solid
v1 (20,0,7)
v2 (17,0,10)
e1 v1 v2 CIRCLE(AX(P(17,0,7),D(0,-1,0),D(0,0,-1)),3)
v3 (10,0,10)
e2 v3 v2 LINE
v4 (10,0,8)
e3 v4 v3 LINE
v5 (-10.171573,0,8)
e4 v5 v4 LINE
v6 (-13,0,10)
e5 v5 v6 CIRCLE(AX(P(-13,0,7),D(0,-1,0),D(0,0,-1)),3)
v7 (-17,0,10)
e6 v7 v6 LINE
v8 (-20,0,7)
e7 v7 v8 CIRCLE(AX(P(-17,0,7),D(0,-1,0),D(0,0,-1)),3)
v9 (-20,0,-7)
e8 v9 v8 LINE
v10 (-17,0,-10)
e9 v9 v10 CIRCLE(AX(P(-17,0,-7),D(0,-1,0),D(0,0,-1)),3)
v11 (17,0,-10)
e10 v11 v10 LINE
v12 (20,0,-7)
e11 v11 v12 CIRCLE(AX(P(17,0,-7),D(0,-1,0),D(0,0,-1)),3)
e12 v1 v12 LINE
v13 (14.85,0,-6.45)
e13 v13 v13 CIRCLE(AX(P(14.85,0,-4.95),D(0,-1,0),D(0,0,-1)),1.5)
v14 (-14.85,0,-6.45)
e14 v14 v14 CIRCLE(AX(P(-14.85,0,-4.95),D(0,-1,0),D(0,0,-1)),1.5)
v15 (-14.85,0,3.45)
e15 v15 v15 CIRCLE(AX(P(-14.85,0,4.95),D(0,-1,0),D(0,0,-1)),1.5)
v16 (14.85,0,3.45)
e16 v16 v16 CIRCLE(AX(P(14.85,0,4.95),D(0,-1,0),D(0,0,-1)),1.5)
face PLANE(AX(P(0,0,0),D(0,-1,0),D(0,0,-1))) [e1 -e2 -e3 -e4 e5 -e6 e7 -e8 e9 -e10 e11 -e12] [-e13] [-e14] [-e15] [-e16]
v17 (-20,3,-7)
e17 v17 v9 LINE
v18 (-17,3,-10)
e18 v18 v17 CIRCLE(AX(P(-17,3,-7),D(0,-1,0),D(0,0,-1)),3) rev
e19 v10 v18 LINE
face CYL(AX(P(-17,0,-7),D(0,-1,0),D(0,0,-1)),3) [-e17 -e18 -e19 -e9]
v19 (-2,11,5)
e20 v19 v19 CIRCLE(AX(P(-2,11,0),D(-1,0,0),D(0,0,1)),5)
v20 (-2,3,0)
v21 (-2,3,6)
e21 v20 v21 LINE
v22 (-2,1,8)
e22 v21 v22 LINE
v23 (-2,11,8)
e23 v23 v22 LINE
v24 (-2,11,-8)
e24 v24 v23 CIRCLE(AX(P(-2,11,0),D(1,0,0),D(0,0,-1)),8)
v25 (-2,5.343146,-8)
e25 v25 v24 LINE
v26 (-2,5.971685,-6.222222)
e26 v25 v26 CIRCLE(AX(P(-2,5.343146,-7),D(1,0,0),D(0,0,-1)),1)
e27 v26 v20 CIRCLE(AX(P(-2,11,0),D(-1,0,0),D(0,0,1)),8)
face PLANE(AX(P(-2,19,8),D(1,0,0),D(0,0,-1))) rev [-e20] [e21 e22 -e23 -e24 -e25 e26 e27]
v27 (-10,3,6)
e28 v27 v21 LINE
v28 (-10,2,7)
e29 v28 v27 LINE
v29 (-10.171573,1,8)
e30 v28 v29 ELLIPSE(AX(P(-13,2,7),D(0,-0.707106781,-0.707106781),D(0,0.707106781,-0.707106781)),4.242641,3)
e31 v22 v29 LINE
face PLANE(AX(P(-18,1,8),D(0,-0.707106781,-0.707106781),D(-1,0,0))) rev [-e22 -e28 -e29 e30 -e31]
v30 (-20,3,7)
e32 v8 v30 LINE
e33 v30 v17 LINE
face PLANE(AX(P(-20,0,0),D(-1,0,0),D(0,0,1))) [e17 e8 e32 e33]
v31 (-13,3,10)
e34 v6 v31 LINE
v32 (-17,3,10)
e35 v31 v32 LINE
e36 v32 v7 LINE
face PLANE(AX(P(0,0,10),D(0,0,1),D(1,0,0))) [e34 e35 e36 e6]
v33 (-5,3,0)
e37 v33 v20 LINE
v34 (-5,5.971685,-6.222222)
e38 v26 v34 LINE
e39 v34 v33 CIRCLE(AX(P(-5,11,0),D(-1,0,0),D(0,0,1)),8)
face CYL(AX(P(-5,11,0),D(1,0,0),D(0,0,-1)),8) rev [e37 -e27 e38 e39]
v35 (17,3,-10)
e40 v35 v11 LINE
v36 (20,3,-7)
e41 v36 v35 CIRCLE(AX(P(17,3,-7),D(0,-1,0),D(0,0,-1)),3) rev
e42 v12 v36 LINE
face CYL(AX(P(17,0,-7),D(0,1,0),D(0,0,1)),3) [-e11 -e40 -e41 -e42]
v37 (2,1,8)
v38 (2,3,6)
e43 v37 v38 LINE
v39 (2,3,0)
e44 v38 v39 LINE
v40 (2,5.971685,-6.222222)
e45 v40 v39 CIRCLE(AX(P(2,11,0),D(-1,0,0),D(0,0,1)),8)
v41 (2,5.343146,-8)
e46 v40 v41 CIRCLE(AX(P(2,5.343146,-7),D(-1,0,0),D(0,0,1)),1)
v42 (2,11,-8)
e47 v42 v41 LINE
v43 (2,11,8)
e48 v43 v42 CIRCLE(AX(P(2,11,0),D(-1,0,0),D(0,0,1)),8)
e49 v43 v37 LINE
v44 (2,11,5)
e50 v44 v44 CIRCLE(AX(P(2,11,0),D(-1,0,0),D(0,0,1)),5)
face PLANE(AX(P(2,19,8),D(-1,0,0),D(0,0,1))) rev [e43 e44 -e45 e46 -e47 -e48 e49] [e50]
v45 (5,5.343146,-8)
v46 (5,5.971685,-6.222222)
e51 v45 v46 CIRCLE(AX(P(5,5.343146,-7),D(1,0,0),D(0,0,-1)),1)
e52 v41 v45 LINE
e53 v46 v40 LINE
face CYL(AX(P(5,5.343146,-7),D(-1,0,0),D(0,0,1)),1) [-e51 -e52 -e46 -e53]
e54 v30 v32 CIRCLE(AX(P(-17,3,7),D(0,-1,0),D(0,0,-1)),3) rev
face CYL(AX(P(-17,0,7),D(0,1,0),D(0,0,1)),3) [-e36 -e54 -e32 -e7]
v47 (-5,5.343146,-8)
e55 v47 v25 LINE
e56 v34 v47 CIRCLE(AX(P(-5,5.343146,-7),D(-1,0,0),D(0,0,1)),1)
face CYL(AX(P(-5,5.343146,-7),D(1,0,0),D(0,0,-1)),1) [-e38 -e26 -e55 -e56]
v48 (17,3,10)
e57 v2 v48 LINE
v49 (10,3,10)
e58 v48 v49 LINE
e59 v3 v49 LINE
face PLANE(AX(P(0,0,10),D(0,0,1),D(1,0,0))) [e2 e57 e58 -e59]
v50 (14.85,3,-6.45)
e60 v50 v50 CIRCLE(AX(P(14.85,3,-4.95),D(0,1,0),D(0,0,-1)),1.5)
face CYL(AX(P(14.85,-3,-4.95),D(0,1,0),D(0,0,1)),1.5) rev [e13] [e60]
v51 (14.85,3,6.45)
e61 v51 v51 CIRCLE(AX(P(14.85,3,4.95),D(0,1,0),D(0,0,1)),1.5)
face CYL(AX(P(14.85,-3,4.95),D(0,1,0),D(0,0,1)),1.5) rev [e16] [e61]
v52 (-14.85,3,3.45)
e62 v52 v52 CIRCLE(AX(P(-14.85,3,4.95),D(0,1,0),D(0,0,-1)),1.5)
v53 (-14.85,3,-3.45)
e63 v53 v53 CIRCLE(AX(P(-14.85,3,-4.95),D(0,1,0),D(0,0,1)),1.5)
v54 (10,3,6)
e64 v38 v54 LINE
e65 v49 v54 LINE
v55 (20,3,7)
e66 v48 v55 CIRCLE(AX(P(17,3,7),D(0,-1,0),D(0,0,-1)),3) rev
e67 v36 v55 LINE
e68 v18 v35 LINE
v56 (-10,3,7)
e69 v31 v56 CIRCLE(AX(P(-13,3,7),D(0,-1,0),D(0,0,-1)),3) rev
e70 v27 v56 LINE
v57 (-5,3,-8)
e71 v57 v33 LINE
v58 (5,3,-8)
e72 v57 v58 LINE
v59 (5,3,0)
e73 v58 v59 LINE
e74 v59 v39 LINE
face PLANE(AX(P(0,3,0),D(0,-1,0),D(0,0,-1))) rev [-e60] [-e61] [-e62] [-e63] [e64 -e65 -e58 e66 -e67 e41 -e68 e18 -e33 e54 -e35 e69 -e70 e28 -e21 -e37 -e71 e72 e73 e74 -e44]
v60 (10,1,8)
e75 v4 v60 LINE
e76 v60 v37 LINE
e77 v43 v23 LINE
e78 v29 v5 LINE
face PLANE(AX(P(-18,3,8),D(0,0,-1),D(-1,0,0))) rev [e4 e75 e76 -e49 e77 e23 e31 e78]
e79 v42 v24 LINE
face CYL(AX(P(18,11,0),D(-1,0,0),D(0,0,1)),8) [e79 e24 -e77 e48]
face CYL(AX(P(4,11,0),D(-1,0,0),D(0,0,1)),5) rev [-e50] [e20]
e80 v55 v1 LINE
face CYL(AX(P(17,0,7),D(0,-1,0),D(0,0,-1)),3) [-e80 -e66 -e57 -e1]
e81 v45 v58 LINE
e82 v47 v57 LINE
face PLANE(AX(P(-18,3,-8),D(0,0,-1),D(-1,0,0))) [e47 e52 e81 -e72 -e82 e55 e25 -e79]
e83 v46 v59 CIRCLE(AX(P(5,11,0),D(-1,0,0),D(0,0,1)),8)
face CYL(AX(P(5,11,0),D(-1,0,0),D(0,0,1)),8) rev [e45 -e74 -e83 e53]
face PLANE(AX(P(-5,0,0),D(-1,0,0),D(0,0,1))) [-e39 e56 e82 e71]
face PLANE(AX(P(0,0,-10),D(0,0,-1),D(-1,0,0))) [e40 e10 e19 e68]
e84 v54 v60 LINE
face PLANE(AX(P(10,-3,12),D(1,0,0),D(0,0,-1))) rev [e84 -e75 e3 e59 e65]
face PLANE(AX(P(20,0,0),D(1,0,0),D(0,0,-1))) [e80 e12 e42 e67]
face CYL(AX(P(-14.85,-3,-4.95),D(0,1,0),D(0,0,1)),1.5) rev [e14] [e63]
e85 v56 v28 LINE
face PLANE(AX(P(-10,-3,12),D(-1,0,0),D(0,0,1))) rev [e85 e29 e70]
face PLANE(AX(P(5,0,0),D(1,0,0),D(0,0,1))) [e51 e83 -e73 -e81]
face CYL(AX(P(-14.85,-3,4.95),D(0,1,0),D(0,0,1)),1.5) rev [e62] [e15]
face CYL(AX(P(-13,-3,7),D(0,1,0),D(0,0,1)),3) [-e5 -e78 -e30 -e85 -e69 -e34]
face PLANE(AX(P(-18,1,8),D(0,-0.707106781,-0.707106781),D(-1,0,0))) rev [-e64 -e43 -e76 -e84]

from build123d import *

# Parameters (mm, degrees)
SKETCH1_W               = 36
SKETCH1_H               = 16
BOSS_EXTRUDE1_DEPTH     = 3
SKETCH3_W               = 4
SKETCH3_H               = 16
BOSS_EXTRUDE2_DEPTH     = 16
BOSS_EXTRUDE3_DEPTH     = 3
CUT_EXTRUDE2_DEPTH      = 29.722813233
CUT_EXTRUDE2_DEPTH_BACK = 29.722813233
FILLET1_START           = -5
FILLET1_DEPTH           = 3
FILLET1_START_2         = 2
FILLET1_2_DEPTH         = 3
SKETCH7_R               = 5
CUT_EXTRUDE3_DEPTH      = 6
SKETCH8_R               = 1.5
CUT_EXTRUDE5_DEPTH      = 6
SKETCH12_W              = 36
SKETCH12_H              = 3
BOSS_EXTRUDE4_DEPTH     = 2
SKETCH13_W              = 36
SKETCH13_H              = 3
BOSS_EXTRUDE5_DEPTH     = 2
SKETCH14_W              = 20
SKETCH14_H              = 3
BOSS_EXTRUDE6_DEPTH     = 2
SKETCH15_W              = 20
SKETCH15_H              = 3
BOSS_EXTRUDE7_DEPTH     = 2
SKETCH16_W              = 20
SKETCH16_H              = 4
CUT_EXTRUDE6_DEPTH      = 6
CHAMFER1_SIZE           = 2
FILLET3_R               = 3


with BuildPart() as part:
    # Sketch1 → Boss-Extrude1 (new body)
    with BuildSketch(Plane(origin=(0, 0, 0), x_dir=(1, 0, 0), z_dir=(0, 1, 0))):
        Rectangle(SKETCH1_W, SKETCH1_H)
    extrude(amount=BOSS_EXTRUDE1_DEPTH)

    # Sketch3 → Boss-Extrude2 (add)
    with BuildSketch(Plane(origin=(0, 3, 0), x_dir=(1, 0, 0), z_dir=(0, 1, 0))):
        Rectangle(SKETCH3_W, SKETCH3_H)
    extrude(amount=BOSS_EXTRUDE2_DEPTH)

    # Sketch4 → Boss-Extrude3 (add)
    with BuildSketch(Plane.ZY.offset(2)):
        with BuildLine():
            Line((-8, 3), (1.5e-08, 3))
            ThreePointArc((1.5e-08, 3), (-5.656854244, 5.343145745), (-8, 11))
            Line((-8, 11), (-8, 3))
        make_face()
    boss_extrude3 = extrude(amount=BOSS_EXTRUDE3_DEPTH)

    # Mirror1: Boss-Extrude3 across plane
    add(boss_extrude3.mirror(Plane(origin=(0, 0, 0), x_dir=(0, 0, 1), z_dir=(1, 0, 0))))

    # Sketch6 → Cut-Extrude2 (cut, two sides: drawn at the far end of the back side and taken through both)
    with BuildSketch(Plane.ZY.offset(2).offset(-CUT_EXTRUDE2_DEPTH_BACK)):
        with BuildLine():
            Line((-8, 19), (-8, 11))
            ThreePointArc((-8, 11), (-5.656854249, 16.656854249), (0, 19))
            Line((0, 19), (-8, 19))
        make_face()
        with BuildLine():
            ThreePointArc((0, 19), (5.656854249, 16.656854249), (8, 11))
            Line((8, 11), (8, 19))
            Line((8, 19), (0, 19))
        make_face()
    extrude(amount=CUT_EXTRUDE2_DEPTH + CUT_EXTRUDE2_DEPTH_BACK, mode=Mode.SUBTRACT)

    # Fillet1: read off the stored shape, not the designer's step
    # Fillet1 outline → Fillet1 (cut)
    with BuildSketch(Plane.YZ.offset(FILLET1_START)):
        with BuildLine():
            ThreePointArc((11, -8), (8.333333334, -7.542472332), (5.971685112, -6.222222222))
            ThreePointArc((5.971685112, -6.222222222), (6.285954792, -7.333333333), (5.343145751, -8))
            Line((5.343145751, -8), (11, -8))
        make_face()
    extrude(amount=FILLET1_DEPTH, mode=Mode.SUBTRACT)

    # Fillet1 2 outline → Fillet1 2 (cut)
    with BuildSketch(Plane.YZ.offset(FILLET1_START_2)):
        with BuildLine():
            ThreePointArc((11, -8), (8.333333334, -7.542472332), (5.971685112, -6.222222222))
            ThreePointArc((5.971685112, -6.222222222), (6.285954792, -7.333333333), (5.343145751, -8))
            Line((5.343145751, -8), (11, -8))
        make_face()
    extrude(amount=FILLET1_2_DEPTH, mode=Mode.SUBTRACT)

    # Sketch7 → Cut-Extrude3 (cut)
    with BuildSketch(Plane.ZY.offset(2)):
        with Locations((0, 11)):
            Circle(SKETCH7_R)
    extrude(amount=-CUT_EXTRUDE3_DEPTH, mode=Mode.SUBTRACT)

    # Sketch8 → Cut-Extrude5 (cut)
    with BuildSketch(Plane(origin=(0, 3, 0), x_dir=(1, 0, 0), z_dir=(0, 1, 0))):
        with Locations(Location((-14.85, 4.95, 0), (0, 0, 270))):
            Circle(SKETCH8_R)
        with Locations(Location((14.85, 4.95, 0), (0, 0, 90))):
            Circle(SKETCH8_R)
        with Locations(Location((14.85, -4.95, 0), (0, 0, 270))):
            Circle(SKETCH8_R)
        with Locations(Location((-14.85, -4.95, 0), (0, 0, 90))):
            Circle(SKETCH8_R)
    extrude(amount=-CUT_EXTRUDE5_DEPTH, mode=Mode.SUBTRACT)

    # Sketch12 → Boss-Extrude4 (add)
    with BuildSketch(Plane.XY.offset(8)):
        with Locations((0, 1.5)):
            Rectangle(SKETCH12_W, SKETCH12_H)
    extrude(amount=BOSS_EXTRUDE4_DEPTH)

    # Sketch13 → Boss-Extrude5 (add)
    with BuildSketch(Plane(origin=(0, 0, -8), x_dir=(-1, 0, 0), z_dir=(0, 0, -1))):
        with Locations((0, 1.5)):
            Rectangle(SKETCH13_W, SKETCH13_H)
    extrude(amount=BOSS_EXTRUDE5_DEPTH)

    # Sketch14 → Boss-Extrude6 (add)
    with BuildSketch(Plane.ZY.offset(18)):
        with Locations((0, 1.5)):
            Rectangle(SKETCH14_W, SKETCH14_H)
    extrude(amount=BOSS_EXTRUDE6_DEPTH)

    # Sketch15 → Boss-Extrude7 (add)
    with BuildSketch(Plane(origin=(18, 0, 0), x_dir=(0, 0, -1), z_dir=(1, 0, 0))):
        with Locations((0, 1.5)):
            Rectangle(SKETCH15_W, SKETCH15_H)
    extrude(amount=BOSS_EXTRUDE7_DEPTH)

    # Sketch16 → Cut-Extrude6 (cut)
    with BuildSketch(Plane(origin=(0, 3, 0), x_dir=(1, 0, 0), z_dir=(0, 1, 0))):
        with Locations((0, -10)):
            Rectangle(SKETCH16_W, SKETCH16_H)
    extrude(amount=-CUT_EXTRUDE6_DEPTH, mode=Mode.SUBTRACT)

    # Chamfer1
    chamfer1_edges = [part.edges().sort_by_distance(p)[0] for p in [
        (6, 3, 8),
        (-6, 3, 8),
    ]]
    chamfer(chamfer1_edges, length=CHAMFER1_SIZE)

    # Fillet3
    fillet3_edges = [part.edges().sort_by_distance(p)[0] for p in [
        (-20, 1.5, -10),
        (-20, 1.5, 10),
        (20, 1.5, 10),
        (20, 1.5, -10),
        (-10, 1.5, 10),
    ]]
    fillet(fillet3_edges, radius=FILLET3_R)


solid = part.part
